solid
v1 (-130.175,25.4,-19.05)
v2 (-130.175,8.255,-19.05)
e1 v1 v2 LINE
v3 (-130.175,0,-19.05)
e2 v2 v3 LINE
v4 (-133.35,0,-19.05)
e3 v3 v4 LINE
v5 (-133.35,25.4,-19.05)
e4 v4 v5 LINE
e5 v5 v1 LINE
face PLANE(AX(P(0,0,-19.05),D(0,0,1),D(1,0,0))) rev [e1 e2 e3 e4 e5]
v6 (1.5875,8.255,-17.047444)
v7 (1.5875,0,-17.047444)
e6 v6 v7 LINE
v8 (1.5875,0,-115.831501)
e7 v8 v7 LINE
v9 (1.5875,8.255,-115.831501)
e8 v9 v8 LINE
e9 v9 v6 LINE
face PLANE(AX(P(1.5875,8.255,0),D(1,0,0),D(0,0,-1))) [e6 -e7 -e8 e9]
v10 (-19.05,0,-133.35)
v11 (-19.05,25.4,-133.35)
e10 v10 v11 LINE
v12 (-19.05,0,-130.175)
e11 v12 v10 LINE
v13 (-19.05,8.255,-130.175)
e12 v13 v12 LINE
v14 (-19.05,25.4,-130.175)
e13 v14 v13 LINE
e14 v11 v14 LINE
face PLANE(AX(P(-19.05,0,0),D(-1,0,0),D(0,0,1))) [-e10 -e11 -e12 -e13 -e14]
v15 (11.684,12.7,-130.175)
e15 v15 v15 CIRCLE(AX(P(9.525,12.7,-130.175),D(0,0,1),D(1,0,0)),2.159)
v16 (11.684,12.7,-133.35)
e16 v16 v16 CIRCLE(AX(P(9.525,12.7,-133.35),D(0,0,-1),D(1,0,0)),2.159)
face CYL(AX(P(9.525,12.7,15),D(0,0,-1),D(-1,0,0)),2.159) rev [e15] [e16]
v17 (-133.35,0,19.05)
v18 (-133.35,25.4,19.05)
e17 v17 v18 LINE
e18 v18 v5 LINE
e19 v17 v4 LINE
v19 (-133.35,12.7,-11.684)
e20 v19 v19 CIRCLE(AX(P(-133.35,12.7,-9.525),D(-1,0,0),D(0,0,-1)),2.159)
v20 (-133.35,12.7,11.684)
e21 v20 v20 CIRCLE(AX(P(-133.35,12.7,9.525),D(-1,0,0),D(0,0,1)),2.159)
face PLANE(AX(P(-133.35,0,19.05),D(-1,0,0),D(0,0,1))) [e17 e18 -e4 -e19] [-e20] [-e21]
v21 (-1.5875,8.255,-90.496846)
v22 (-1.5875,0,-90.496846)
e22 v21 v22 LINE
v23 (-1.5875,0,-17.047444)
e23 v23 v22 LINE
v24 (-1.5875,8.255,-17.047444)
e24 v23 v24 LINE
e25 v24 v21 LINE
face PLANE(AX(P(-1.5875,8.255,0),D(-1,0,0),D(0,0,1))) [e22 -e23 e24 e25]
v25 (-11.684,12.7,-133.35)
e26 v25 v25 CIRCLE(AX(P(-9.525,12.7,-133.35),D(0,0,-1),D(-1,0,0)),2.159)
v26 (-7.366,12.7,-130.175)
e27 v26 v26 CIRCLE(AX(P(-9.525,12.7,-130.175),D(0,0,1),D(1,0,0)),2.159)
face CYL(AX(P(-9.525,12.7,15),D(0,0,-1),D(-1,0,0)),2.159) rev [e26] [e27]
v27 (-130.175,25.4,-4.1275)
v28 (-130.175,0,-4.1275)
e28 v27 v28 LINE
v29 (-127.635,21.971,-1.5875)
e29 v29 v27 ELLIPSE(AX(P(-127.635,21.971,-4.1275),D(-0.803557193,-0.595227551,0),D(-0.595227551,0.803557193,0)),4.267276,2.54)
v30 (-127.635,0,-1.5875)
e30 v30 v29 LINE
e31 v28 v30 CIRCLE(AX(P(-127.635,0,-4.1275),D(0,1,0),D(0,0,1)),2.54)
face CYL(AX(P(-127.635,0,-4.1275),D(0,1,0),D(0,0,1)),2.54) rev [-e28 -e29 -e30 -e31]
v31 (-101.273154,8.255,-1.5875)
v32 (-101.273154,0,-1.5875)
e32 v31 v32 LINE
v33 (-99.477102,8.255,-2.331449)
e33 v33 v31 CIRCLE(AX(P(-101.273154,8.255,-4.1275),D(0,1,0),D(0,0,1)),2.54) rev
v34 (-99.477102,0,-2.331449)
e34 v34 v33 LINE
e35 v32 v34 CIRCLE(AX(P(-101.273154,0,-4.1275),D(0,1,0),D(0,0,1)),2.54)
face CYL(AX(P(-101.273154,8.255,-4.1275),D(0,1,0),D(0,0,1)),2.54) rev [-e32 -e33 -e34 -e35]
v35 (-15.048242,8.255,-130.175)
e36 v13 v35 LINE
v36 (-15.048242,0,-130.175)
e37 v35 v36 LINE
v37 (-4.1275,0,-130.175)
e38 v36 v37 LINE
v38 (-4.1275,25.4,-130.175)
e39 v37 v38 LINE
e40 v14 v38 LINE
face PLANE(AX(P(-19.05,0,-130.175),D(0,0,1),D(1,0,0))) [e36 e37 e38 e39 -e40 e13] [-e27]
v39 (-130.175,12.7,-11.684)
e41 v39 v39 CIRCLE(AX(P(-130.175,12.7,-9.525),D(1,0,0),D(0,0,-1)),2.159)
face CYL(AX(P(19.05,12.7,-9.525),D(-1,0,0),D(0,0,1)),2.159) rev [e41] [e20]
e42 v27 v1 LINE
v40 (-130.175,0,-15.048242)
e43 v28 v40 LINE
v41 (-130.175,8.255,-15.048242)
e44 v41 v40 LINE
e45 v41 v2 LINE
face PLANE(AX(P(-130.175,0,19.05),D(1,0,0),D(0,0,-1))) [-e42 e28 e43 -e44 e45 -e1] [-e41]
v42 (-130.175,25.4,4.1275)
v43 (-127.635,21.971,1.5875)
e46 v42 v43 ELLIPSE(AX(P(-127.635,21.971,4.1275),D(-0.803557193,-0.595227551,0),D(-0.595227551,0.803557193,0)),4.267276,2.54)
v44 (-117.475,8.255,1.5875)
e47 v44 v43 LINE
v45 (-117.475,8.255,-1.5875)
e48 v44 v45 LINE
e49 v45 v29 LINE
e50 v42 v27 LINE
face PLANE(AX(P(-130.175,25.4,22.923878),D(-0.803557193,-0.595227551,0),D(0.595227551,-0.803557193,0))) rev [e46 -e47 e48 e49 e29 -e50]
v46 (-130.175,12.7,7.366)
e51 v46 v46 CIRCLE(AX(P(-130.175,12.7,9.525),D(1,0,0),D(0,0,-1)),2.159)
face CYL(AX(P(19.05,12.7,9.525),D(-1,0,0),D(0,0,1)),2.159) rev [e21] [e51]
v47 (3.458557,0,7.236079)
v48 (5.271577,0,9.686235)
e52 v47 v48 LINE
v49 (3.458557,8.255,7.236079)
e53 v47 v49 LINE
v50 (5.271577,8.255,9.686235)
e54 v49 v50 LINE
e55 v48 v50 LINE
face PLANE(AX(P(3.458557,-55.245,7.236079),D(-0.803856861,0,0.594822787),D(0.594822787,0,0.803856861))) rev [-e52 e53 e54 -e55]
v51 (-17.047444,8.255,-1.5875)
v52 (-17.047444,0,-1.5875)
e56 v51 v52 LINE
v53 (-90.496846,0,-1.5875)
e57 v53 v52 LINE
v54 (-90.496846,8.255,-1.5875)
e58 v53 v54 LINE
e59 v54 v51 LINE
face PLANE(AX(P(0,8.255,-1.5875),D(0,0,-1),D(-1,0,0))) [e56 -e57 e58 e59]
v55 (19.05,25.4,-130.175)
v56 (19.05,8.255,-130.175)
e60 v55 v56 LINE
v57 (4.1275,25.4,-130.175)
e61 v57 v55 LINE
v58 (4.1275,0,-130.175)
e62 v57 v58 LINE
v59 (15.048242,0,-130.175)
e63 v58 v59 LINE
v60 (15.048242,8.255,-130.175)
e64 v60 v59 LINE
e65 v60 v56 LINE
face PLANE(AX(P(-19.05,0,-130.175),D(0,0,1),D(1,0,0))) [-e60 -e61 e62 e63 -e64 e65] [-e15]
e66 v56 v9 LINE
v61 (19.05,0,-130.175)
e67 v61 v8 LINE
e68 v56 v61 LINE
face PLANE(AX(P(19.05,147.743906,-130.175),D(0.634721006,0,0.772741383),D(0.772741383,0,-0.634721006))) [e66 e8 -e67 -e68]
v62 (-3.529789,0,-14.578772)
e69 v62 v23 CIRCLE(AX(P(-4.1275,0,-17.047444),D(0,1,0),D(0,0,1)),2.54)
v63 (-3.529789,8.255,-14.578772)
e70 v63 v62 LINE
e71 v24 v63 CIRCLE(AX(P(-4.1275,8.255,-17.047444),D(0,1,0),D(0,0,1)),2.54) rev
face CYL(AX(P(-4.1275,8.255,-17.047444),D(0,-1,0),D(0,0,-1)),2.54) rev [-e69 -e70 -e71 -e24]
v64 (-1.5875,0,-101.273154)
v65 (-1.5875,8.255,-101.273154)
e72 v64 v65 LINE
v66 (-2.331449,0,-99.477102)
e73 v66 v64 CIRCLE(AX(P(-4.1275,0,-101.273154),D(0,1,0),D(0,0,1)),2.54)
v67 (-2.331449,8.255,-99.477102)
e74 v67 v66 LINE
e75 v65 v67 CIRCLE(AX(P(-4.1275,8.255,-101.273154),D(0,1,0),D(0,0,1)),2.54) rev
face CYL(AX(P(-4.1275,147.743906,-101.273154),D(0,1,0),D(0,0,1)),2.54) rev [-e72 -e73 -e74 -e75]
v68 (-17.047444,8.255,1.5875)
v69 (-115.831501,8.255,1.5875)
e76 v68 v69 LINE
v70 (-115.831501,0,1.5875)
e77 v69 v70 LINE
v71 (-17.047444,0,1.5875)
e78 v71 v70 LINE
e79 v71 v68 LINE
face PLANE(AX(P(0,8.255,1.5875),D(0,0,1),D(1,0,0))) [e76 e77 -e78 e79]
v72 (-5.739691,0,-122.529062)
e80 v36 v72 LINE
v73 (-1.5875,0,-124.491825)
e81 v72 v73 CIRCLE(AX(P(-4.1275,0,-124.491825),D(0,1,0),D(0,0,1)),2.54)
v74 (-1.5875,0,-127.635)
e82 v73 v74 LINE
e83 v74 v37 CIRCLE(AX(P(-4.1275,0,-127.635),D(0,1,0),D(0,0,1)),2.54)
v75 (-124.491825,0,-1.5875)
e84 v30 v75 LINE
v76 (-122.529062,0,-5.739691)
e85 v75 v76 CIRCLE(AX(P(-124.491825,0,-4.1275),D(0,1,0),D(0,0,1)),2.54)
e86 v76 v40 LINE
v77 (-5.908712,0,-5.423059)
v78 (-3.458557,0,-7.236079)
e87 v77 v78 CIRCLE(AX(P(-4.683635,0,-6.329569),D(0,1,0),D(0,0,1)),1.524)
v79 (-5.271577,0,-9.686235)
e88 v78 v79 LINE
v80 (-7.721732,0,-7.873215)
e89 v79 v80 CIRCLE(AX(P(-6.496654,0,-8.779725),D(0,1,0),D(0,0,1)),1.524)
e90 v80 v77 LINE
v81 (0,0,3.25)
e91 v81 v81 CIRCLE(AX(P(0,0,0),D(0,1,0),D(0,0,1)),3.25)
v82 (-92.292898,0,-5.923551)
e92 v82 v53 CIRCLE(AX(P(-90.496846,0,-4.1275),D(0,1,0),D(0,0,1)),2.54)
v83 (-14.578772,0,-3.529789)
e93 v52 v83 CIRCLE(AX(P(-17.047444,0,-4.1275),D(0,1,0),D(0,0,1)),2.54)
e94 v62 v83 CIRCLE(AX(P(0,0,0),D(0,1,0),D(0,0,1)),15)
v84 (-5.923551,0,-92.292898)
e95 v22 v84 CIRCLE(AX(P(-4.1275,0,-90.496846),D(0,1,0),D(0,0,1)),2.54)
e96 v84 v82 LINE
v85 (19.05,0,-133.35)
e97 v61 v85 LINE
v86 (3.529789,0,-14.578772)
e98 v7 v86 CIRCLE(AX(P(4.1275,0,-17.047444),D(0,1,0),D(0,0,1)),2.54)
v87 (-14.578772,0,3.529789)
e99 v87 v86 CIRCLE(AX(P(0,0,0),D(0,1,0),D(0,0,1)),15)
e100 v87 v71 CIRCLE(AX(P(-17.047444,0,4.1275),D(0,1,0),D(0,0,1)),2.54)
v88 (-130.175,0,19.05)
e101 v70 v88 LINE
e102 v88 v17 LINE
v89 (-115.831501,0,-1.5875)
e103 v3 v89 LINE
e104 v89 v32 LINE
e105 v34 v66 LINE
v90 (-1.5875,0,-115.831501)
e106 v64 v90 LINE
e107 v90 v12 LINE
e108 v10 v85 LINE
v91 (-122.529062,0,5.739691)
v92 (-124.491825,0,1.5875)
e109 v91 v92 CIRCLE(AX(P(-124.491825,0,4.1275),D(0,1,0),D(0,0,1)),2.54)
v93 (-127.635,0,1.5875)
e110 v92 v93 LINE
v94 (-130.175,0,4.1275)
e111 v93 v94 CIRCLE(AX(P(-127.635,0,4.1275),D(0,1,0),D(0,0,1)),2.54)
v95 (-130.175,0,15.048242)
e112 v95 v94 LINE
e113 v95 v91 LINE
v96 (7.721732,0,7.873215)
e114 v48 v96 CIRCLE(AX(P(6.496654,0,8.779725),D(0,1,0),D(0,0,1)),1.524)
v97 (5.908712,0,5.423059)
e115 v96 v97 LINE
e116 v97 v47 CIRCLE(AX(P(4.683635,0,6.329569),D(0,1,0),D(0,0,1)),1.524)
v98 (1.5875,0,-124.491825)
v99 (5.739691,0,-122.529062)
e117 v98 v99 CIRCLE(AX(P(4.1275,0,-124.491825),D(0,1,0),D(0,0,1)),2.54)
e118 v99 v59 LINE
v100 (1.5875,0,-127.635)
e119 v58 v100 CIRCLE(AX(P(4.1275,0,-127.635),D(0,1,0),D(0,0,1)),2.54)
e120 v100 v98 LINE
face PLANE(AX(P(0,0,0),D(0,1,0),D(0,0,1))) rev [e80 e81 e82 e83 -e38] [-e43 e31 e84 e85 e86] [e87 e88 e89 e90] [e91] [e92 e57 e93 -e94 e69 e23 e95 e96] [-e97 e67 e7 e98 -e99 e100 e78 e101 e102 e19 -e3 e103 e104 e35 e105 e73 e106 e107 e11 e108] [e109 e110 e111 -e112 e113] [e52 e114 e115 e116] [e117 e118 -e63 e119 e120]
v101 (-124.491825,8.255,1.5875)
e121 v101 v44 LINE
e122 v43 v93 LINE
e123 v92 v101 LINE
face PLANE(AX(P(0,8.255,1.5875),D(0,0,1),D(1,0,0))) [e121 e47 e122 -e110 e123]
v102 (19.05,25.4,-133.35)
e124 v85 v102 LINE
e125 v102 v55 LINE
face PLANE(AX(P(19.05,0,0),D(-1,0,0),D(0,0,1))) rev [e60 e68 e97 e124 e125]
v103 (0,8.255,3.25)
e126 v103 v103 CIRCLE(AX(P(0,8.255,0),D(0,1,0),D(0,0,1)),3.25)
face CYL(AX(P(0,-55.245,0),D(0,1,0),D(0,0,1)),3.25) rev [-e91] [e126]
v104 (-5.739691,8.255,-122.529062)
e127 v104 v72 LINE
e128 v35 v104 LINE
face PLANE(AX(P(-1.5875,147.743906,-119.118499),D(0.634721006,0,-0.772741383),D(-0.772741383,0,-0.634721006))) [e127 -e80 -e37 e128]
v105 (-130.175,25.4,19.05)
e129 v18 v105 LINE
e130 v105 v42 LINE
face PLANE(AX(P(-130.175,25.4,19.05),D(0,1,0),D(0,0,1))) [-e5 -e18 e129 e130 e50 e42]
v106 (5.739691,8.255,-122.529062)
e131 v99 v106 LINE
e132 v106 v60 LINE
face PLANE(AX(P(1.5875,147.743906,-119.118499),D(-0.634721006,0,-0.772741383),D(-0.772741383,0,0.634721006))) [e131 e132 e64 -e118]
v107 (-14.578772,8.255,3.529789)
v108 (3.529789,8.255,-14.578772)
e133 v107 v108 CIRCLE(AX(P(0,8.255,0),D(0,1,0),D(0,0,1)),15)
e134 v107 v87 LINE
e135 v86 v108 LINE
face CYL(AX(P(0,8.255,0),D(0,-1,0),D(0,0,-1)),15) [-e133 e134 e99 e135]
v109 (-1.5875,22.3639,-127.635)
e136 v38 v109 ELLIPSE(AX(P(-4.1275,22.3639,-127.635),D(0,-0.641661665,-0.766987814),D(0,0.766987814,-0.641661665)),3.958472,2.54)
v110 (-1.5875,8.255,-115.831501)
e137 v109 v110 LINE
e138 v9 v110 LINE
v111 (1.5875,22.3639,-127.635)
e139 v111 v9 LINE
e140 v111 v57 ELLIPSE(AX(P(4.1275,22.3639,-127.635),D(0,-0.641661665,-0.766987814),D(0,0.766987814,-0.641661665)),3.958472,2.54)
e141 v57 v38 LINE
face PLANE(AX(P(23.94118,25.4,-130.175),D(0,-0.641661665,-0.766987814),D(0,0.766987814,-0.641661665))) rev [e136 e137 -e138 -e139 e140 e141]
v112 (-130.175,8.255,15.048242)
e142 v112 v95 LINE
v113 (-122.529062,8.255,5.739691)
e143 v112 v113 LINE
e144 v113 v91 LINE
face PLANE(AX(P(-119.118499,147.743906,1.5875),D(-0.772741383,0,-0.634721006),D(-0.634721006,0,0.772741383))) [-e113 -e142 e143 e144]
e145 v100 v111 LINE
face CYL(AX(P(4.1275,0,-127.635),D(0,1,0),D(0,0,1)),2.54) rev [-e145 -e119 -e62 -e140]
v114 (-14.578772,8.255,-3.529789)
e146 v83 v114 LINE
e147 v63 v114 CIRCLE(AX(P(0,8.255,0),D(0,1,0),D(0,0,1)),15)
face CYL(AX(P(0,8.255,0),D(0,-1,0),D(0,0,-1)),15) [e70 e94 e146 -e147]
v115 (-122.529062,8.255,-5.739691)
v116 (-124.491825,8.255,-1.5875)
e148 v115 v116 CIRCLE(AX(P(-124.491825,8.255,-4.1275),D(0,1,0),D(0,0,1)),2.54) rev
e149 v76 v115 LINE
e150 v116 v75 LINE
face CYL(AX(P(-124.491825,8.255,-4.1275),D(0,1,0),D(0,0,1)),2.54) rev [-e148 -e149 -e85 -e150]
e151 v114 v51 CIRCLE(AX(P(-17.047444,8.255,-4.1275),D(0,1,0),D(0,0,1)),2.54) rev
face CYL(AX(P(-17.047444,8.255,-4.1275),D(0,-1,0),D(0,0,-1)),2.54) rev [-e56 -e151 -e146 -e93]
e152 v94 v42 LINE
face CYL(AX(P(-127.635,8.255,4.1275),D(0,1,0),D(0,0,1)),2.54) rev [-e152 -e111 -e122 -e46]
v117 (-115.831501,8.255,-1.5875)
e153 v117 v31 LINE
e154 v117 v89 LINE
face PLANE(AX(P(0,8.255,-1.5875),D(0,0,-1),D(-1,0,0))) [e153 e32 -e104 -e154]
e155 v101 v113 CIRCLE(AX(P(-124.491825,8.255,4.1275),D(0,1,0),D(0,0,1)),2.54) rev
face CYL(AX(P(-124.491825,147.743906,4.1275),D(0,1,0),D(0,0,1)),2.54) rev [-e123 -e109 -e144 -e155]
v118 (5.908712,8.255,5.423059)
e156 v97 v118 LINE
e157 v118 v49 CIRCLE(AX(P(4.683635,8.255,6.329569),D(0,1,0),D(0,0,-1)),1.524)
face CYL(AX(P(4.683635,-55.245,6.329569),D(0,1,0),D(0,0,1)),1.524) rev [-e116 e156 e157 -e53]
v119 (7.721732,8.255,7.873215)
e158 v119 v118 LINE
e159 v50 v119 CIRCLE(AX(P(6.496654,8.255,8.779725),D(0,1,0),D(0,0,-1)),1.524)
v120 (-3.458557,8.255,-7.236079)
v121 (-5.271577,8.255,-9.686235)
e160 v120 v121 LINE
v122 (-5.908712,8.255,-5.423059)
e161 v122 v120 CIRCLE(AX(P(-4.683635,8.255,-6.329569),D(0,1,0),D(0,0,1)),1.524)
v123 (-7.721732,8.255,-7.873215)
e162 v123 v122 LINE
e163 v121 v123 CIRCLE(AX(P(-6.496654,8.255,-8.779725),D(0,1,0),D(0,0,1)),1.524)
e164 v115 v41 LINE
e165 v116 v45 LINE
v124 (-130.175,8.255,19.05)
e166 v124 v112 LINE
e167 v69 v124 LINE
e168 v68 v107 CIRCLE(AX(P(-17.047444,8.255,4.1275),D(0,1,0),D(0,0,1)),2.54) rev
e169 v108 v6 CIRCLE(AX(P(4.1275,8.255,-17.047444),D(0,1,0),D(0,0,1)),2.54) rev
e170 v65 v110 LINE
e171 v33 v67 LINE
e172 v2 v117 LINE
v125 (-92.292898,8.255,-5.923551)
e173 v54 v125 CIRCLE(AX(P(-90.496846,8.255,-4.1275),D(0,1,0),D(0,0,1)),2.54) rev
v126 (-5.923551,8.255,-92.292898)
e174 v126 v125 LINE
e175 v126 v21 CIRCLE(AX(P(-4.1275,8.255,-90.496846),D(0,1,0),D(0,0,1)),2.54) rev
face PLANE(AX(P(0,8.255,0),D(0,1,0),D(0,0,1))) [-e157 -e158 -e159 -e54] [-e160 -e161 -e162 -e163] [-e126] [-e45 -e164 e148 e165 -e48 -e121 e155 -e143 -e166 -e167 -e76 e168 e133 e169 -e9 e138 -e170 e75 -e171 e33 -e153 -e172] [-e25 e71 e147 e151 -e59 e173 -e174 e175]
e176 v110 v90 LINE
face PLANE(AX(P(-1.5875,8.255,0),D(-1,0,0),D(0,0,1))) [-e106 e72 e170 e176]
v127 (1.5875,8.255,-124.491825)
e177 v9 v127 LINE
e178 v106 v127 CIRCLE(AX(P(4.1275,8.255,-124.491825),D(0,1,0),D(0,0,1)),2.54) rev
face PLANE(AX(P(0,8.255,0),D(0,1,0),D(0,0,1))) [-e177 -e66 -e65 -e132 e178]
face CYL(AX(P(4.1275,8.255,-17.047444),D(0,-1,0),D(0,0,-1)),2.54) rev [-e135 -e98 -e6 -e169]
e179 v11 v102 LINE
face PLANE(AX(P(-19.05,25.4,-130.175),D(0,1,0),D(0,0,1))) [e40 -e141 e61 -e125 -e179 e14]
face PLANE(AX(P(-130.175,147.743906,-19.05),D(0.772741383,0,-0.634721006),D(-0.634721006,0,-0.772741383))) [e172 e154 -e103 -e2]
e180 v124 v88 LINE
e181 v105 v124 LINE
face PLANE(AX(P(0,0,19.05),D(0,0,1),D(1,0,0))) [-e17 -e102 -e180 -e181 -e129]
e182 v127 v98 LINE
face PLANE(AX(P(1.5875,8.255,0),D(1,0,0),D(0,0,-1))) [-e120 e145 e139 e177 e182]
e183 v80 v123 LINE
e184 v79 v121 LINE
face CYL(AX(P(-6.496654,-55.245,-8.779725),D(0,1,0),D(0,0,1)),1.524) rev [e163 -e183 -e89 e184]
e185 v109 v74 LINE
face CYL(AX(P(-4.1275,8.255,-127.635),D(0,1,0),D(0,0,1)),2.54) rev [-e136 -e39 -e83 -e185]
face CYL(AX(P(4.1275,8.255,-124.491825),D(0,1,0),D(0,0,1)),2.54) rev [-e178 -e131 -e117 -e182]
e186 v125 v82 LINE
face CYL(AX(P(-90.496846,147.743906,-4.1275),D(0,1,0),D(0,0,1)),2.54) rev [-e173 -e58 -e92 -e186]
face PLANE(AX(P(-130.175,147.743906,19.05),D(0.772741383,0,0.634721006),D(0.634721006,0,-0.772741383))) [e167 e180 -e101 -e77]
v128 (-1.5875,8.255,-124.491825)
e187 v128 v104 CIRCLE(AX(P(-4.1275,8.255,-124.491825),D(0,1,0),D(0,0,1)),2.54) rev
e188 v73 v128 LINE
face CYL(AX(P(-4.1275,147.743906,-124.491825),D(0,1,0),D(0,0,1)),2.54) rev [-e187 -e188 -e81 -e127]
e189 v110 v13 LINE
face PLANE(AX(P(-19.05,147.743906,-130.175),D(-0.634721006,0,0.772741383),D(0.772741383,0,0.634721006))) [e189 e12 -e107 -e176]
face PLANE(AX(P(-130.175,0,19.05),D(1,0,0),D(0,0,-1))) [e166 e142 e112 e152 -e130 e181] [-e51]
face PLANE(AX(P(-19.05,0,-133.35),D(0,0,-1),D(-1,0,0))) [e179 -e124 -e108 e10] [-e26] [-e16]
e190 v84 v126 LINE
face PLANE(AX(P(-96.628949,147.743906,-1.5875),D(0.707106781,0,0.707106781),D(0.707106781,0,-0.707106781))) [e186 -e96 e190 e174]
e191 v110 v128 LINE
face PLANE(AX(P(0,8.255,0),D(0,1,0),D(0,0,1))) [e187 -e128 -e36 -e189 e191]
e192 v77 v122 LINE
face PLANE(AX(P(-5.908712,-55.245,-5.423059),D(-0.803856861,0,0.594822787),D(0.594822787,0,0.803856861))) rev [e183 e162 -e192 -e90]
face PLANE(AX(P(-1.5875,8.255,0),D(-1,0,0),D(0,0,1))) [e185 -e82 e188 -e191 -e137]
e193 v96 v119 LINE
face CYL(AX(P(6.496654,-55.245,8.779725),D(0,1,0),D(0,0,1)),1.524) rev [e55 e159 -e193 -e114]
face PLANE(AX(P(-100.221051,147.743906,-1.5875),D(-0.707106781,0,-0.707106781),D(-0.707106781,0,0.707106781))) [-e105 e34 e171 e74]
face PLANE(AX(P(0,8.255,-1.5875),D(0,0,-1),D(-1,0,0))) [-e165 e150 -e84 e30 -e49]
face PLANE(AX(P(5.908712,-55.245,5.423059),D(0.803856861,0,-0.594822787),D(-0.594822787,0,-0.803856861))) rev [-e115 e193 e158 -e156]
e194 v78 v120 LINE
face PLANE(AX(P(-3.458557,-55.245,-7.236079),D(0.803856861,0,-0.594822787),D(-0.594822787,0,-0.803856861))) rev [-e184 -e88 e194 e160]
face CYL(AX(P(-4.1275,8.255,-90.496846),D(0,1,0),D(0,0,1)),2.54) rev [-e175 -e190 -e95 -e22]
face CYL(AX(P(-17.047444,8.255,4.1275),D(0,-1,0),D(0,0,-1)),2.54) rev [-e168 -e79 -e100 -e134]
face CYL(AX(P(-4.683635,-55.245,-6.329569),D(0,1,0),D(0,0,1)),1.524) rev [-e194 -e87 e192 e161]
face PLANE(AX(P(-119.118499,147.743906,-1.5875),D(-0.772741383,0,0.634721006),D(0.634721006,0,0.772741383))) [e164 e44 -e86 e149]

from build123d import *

# Parameters (mm, degrees)
SKETCH1_R                       = 15
BOSS_EXTRUDE2_DEPTH             = 8.255
BOSS_EXTRUDE3_DEPTH             = 8.255
SKETCH5_R                       = 3.249999977
CUT_EXTRUDE3_DEPTH              = 63.5
SKETCH7_W                       = 3.175
SKETCH7_H                       = 25.4
BOSS_EXTRUDE5_DEPTH             = 19.05
SKETCH12_R                      = 2.159
CUT_EXTRUDE6_DEPTH              = 199.993500208
CIRPATTERN2_COUNT               = 2
CIRPATTERN2_ANGLE               = 90
CIRPATTERN3_COUNT               = 2
CIRPATTERN3_ANGLE               = 90
BOSS_EXTRUDE6_DEPTH             = 8.255
BOSS_EXTRUDE7_REACH             = 192.288
BOSS_EXTRUDE7_DIRECTION_2_REACH = 192.288
BOSS_EXTRUDE8_REACH             = 192.288
BOSS_EXTRUDE8_DIRECTION_2_REACH = 192.288
FILLET1_R                       = 2.54


with BuildPart() as part:
    # Sketch1 → Boss-Extrude2 (new body)
    with BuildSketch(Plane(origin=(0, 0, 0), x_dir=(1, 0, 0), z_dir=(0, 1, 0))):
        with Locations(Location((0, 0, 0), (0, 0, 270))):
            Circle(SKETCH1_R)
    extrude(amount=BOSS_EXTRUDE2_DEPTH)

    # Sketch1<6> → Boss-Extrude3 (add)
    with BuildSketch(Plane(origin=(0, 0, 0), x_dir=(1, 0, 0), z_dir=(0, 1, 0))):
        with BuildLine():
            Line((-1.5875, 130.175), (-1.5875, 14.915758236))
            ThreePointArc((-1.5875, 14.915758236), (0, 15), (1.5875, 14.915758236))
            Line((1.5875, 14.915758236), (1.5875, 130.175))
            Line((1.5875, 130.175), (-1.5875, 130.175))
        make_face()
        with BuildLine():
            ThreePointArc((-14.915758236, -1.5875), (-15, 0), (-14.915758236, 1.5875))
            Line((-14.915758236, 1.5875), (-130.175, 1.5875))
            Line((-130.175, 1.5875), (-130.175, -1.5875))
            Line((-130.175, -1.5875), (-14.915758236, -1.5875))
        make_face()
    extrude(amount=BOSS_EXTRUDE3_DEPTH)

    # Sketch5 → Cut-Extrude3 (cut)
    with BuildSketch(Plane(origin=(0, 8.255, 0), x_dir=(1, 0, 0), z_dir=(0, 1, 0))):
        with Locations(Location((0, 0, 0), (0, 0, 270))):
            Circle(SKETCH5_R)
        with BuildLine():
            Line((-5.908712478, 5.423058993), (-7.721732332, 7.873214705))
            ThreePointArc((-7.721732332, 7.873214705), (-7.403164404, 10.004802487), (-5.271576621, 9.686234559))
            Line((-5.271576621, 9.686234559), (-3.458556767, 7.236078848))
            ThreePointArc((-3.458556767, 7.236078848), (-3.777124696, 5.104491065), (-5.908712478, 5.423058993))
        make_face()
        with BuildLine():
            Line((3.458556767, -7.236078848), (5.271576621, -9.686234559))
            ThreePointArc((5.271576621, -9.686234559), (7.403164404, -10.004802487), (7.721732332, -7.873214705))
            Line((7.721732332, -7.873214705), (5.908712478, -5.423058993))
            ThreePointArc((5.908712478, -5.423058993), (3.777124696, -5.104491065), (3.458556767, -7.236078848))
        make_face()
    extrude(amount=-CUT_EXTRUDE3_DEPTH, mode=Mode.SUBTRACT)

    # Sketch7 → Boss-Extrude5 (add, symmetric)
    with BuildSketch(Plane(origin=(0, 0, 0), x_dir=(0, 0, -1), z_dir=(1, 0, 0))):
        with Locations((131.7625, 12.7)):
            Rectangle(SKETCH7_W, SKETCH7_H)
    boss_extrude5 = extrude(amount=BOSS_EXTRUDE5_DEPTH, both=True)

    # Sketch12 → Cut-Extrude6 (cut, through all)
    with BuildSketch(Plane(origin=(0, 0, -133.35), x_dir=(-1, 0, 0), z_dir=(0, 0, -1))):
        with Locations((9.525, 12.7)):
            Circle(SKETCH12_R)
        with Locations(Location((-9.525, 12.7, 0), (0, 0, 180))):
            Circle(SKETCH12_R)
    cut_extrude6 = extrude(amount=-CUT_EXTRUDE6_DEPTH, mode=Mode.SUBTRACT)

    # CirPattern2: Boss-Extrude5 ×2 about axis
    cirpattern2_axis = Axis((0, 0, 0), (0, 1, 0))
    for i in range(1, CIRPATTERN2_COUNT):
        add(boss_extrude5.rotate(cirpattern2_axis, i * CIRPATTERN2_ANGLE / (CIRPATTERN2_COUNT - 1)))

    # CirPattern3: Cut-Extrude6 ×2 about axis
    cirpattern3_axis = Axis((0, 0, 0), (0, 1, 0))
    for i in range(1, CIRPATTERN3_COUNT):
        add(cut_extrude6.rotate(cirpattern3_axis, i * CIRPATTERN3_ANGLE / (CIRPATTERN3_COUNT - 1)), mode=Mode.SUBTRACT)

    # Sketch13 → Boss-Extrude6 (add)
    with BuildSketch(Plane.XZ):
        Polygon((-96.628948776, -1.5875), (-1.5875, -96.628948776), (-1.5875, -100.221051224), (-100.221051224, -1.5875), align=None)
        Polygon((-19.05, -130.175), (-1.5875, -115.831500599), (-1.5875, -119.118499401), (-15.048241783, -130.175), align=None)
        Polygon((19.05, -130.175), (1.5875, -115.831500599), (1.5875, -119.118499401), (15.048241783, -130.175), align=None)
        Polygon((-119.118499401, 1.5875), (-130.175, 15.048241783), (-130.175, 19.05), (-115.831500599, 1.5875), align=None)
        Polygon((-119.118499401, -1.5875), (-130.175, -15.048241783), (-130.175, -19.05), (-115.831500599, -1.5875), align=None)
    extrude(amount=-BOSS_EXTRUDE6_DEPTH)

    # Boss-Extrude7: up to this face of the body (flat: up to its plane)
    boss_extrude7_end = Plane(part.part.faces().sort_by_distance((-124.646749701, 4.1275, 1.5875))[0])
    # Sketch14 → Boss-Extrude7 (add, up to the picked face)
    with BuildSketch(Plane.XY, mode=Mode.PRIVATE) as boss_extrude7_sk1:
        Polygon((-130.175, 25.4), (-117.475, 8.255), (-130.175, 8.255), align=None)
    boss_extrude7_tool1 = split(extrude(boss_extrude7_sk1.sketch, amount=BOSS_EXTRUDE7_REACH, mode=Mode.PRIVATE), bisect_by=boss_extrude7_end, keep=Keep.BOTH, mode=Mode.PRIVATE)
    add(boss_extrude7_tool1.solids().sort_by(Axis((-125.941667, 13.97, 0), (0, 0, 1)))[0])

    # Boss-Extrude7 direction 2: up to this face of the body (flat: up to its plane)
    boss_extrude7_direction_2_end = Plane(part.part.faces().sort_by_distance((-124.646749701, 4.1275, -1.5875))[0])
    # Sketch14 → Boss-Extrude7 direction 2 (add, up to the picked face)
    with BuildSketch(Plane.XY, mode=Mode.PRIVATE) as boss_extrude7_direction_2_sk1:
        Polygon((-130.175, 25.4), (-117.475, 8.255), (-130.175, 8.255), align=None)
    boss_extrude7_direction_2_tool1 = split(extrude(boss_extrude7_direction_2_sk1.sketch, amount=-BOSS_EXTRUDE7_DIRECTION_2_REACH, mode=Mode.PRIVATE), bisect_by=boss_extrude7_direction_2_end, keep=Keep.BOTH, mode=Mode.PRIVATE)
    add(boss_extrude7_direction_2_tool1.solids().sort_by(Axis((-125.941667, 13.97, 0), (0, 0, -1)))[0])

    # Boss-Extrude8: up to this face of the body (flat: up to its plane)
    boss_extrude8_end = Plane(part.part.faces().sort_by_distance((1.5875, 4.1275, -65.373629417))[0])
    # Sketch15 → Boss-Extrude8 (add, up to the picked face)
    with BuildSketch(Plane(origin=(0, 0, 0), x_dir=(0, 0, -1), z_dir=(1, 0, 0)), mode=Mode.PRIVATE) as boss_extrude8_sk1:
        Polygon((130.175, 25.4), (115.831500599, 8.255), (130.175, 8.255), align=None)
    boss_extrude8_tool1 = split(extrude(boss_extrude8_sk1.sketch, amount=BOSS_EXTRUDE8_REACH, mode=Mode.PRIVATE), bisect_by=boss_extrude8_end, keep=Keep.BOTH, mode=Mode.PRIVATE)
    add(boss_extrude8_tool1.solids().sort_by(Axis((0, 13.97, -125.393834), (1, 0, 0)))[0])

    # Boss-Extrude8 direction 2: up to this face of the body (flat: up to its plane)
    boss_extrude8_direction_2_end = Plane(part.part.faces().sort_by_distance((-1.5875, 4.1275, -108.026275912))[0])
    # Sketch15 → Boss-Extrude8 direction 2 (add, up to the picked face)
    with BuildSketch(Plane(origin=(0, 0, 0), x_dir=(0, 0, -1), z_dir=(1, 0, 0)), mode=Mode.PRIVATE) as boss_extrude8_direction_2_sk1:
        Polygon((130.175, 25.4), (115.831500599, 8.255), (130.175, 8.255), align=None)
    boss_extrude8_direction_2_tool1 = split(extrude(boss_extrude8_direction_2_sk1.sketch, amount=-BOSS_EXTRUDE8_DIRECTION_2_REACH, mode=Mode.PRIVATE), bisect_by=boss_extrude8_direction_2_end, keep=Keep.BOTH, mode=Mode.PRIVATE)
    add(boss_extrude8_direction_2_tool1.solids().sort_by(Axis((0, 13.97, -125.393834), (-1, 0, 0)))[0])

    # Fillet1
    # the kernel refuses this fillet: 2.54 mm, written as the material it adds along each edge
    with BuildSketch(Plane(origin=(-1.5875, 0, -100.221051224), x_dir=(0, 0, -1), z_dir=(0, 1, 0)), Plane(origin=(-100.221051224, 0, -1.5875), x_dir=(0.7071067811865548, 0, -0.70710678118654), z_dir=(0, 1, 0))) as fillet1_piece_1:
        with BuildLine():
            CenterArc((FILLET1_R * 0.414213562373, FILLET1_R), FILLET1_R, 225, 45)
            Line((-FILLET1_R * 0.292893218813, FILLET1_R * 0.292893218813), (0, 0))
            Line((0, 0), (FILLET1_R * 0.414213562373, 0))
        make_face()
    extrude(amount=8.255)
    with BuildSketch(Plane(origin=(-1.5875, 0, -96.628948776), x_dir=(-0.7071067811865486, 0, 0.7071067811865464), z_dir=(0, 1, 0))) as fillet1_piece_2:
        with BuildLine():
            CenterArc((FILLET1_R * 2.41421356237, FILLET1_R), FILLET1_R, 135, 135)
            Line((FILLET1_R * 1.70710678119, FILLET1_R * 1.70710678119), (0, 0))
            Line((0, 0), (FILLET1_R * 2.41421356237, 0))
        make_face()
    extrude(amount=8.255)
    with BuildSketch(Plane(origin=(-96.628948776, 0, -1.5875), x_dir=(0.7071067811865482, 0, -0.7071067811865468), z_dir=(0, 1, 0))) as fillet1_piece_3:
        with BuildLine():
            CenterArc((FILLET1_R * 2.41421356237, -FILLET1_R), FILLET1_R, 90, 135)
            Line((FILLET1_R * 1.70710678119, -FILLET1_R * 1.70710678119), (0, 0))
            Line((0, 0), (FILLET1_R * 2.41421356237, 0))
        make_face()
    extrude(amount=8.255)
    with BuildSketch(Plane(origin=(-1.5875, 0, -119.118499401), x_dir=(-0.7727413829078122, 0, -0.6347210057511268), z_dir=(0, 1, 0)), Plane(origin=(-119.118499401, 0, 1.5875), x_dir=(-0.6347210057511247, 0, 0.772741382907814), z_dir=(0, 1, 0))) as fillet1_piece_4:
        with BuildLine():
            CenterArc((FILLET1_R * 2.11548267235, -FILLET1_R), FILLET1_R, 90, 129.399295056)
            Line((FILLET1_R * 1.34274128944, -FILLET1_R * 1.63472100575), (0, 0))
            Line((0, 0), (FILLET1_R * 2.11548267235, 0))
        make_face()
    extrude(amount=8.255)
    with BuildSketch(Plane(origin=(1.5875, 0, -119.118499401), x_dir=(0.7727413829078027, 0, -0.6347210057511384), z_dir=(0, 1, 0)), Plane(origin=(-119.118499401, 0, -1.5875), x_dir=(-0.6347210057511417, 0, -0.7727413829077999), z_dir=(0, 1, 0))) as fillet1_piece_5:
        with BuildLine():
            CenterArc((FILLET1_R * 2.11548267235, FILLET1_R), FILLET1_R, 140.600704944, 129.399295056)
            Line((FILLET1_R * 1.34274128944, FILLET1_R * 1.63472100575), (0, 0))
            Line((0, 0), (FILLET1_R * 2.11548267235, 0))
        make_face()
    extrude(amount=8.255)
    with BuildSketch(Plane(origin=(-1.5875, 0, -14.915758236), x_dir=(0, 0, -1), z_dir=(0, 1, 0)), Plane(origin=(-14.915758236, 0, 1.5875), x_dir=(-1, 0, 0), z_dir=(0, 1, 0))) as fillet1_piece_6:
        with BuildLine():
            CenterArc((2.131685671, 2.54), FILLET1_R, 193.610443403, 76.389556597)
            ThreePointArc((-0.336986366, 1.942289054), (-0.136551619, 0.976686375), (0, 0))
            Line((0, 0), (2.131685671, 0))
        make_face()
    extrude(amount=8.255)
    with BuildSketch(Plane(origin=(1.5875, 0, -14.915758236), x_dir=(0.9852804411442203, 0, 0.1709457583523227), z_dir=(0, 1, 0)), Plane(origin=(-14.915758236, 0, -1.5875), x_dir=(0.1709457583523069, 0, -0.985280441144223), z_dir=(0, 1, 0))) as fillet1_piece_7:
        with BuildLine():
            CenterArc((2.138209697, 2.534510424), FILLET1_R, 189.842811987, 76.389556597)
            Line((-0.364402624, 2.100308198), (0, 0))
            ThreePointArc((0, 0), (0.985652903, 0.032418754), (1.971305805, 0))
        make_face()
    extrude(amount=8.255)
    with BuildSketch(Plane(origin=(1.5875, 25.4, -130.175), x_dir=(0, 0, 1), z_dir=(0, -1, 0))) as fillet1_piece_8_section:
        with BuildLine():
            CenterArc((FILLET1_R, -FILLET1_R), FILLET1_R, 90, 90)
            Line((0, -FILLET1_R), (0, 0))
            Line((0, 0), (FILLET1_R, 0))
        make_face()
    fillet1_piece_8 = extrude(amount=25.4, mode=Mode.PRIVATE)
    fillet1_piece_8 = split(fillet1_piece_8, bisect_by=Plane(origin=(2.171046613, 17.455238274, -123.528415861), z_dir=(0, -0.6416616654193366, -0.7669878141999933)), keep=Keep.TOP, mode=Mode.PRIVATE)
    add(fillet1_piece_8)
    with BuildSketch(Plane(origin=(-1.5875, 25.4, -130.175), x_dir=(-1, 0, 0), z_dir=(0, -1, 0))) as fillet1_piece_9_section:
        with BuildLine():
            CenterArc((FILLET1_R, -FILLET1_R), FILLET1_R, 90, 90)
            Line((0, -FILLET1_R), (0, 0))
            Line((0, 0), (FILLET1_R, 0))
        make_face()
    fillet1_piece_9 = extrude(amount=25.4, mode=Mode.PRIVATE)
    fillet1_piece_9 = split(fillet1_piece_9, bisect_by=Plane(origin=(-2.171046613, 17.455238274, -123.528415861), z_dir=(0, -0.6416616654193366, -0.7669878141999933)), keep=Keep.TOP, mode=Mode.PRIVATE)
    add(fillet1_piece_9)
    with BuildSketch(Plane(origin=(-130.175, 25.4, -1.5875), x_dir=(1, 0, 0), z_dir=(0, -1, 0))) as fillet1_piece_10_section:
        with BuildLine():
            CenterArc((FILLET1_R, -FILLET1_R), FILLET1_R, 90, 90)
            Line((0, -FILLET1_R), (0, 0))
            Line((0, 0), (FILLET1_R, 0))
        make_face()
    fillet1_piece_10 = extrude(amount=25.4, mode=Mode.PRIVATE)
    fillet1_piece_10 = split(fillet1_piece_10, bisect_by=Plane(origin=(-123.721618639, 16.687935162, -2.172181801), z_dir=(-0.8035571933447456, -0.5952275506257377, 0)), keep=Keep.TOP, mode=Mode.PRIVATE)
    add(fillet1_piece_10)
    with BuildSketch(Plane(origin=(-130.175, 25.4, 1.5875), x_dir=(0, 0, 1), z_dir=(0, -1, 0))) as fillet1_piece_11_section:
        with BuildLine():
            CenterArc((FILLET1_R, -FILLET1_R), FILLET1_R, 90, 90)
            Line((0, -FILLET1_R), (0, 0))
            Line((0, 0), (FILLET1_R, 0))
        make_face()
    fillet1_piece_11 = extrude(amount=25.4, mode=Mode.PRIVATE)
    fillet1_piece_11 = split(fillet1_piece_11, bisect_by=Plane(origin=(-123.721618639, 16.687935162, 2.172181801), z_dir=(-0.8035571933447456, -0.5952275506257377, 0)), keep=Keep.TOP, mode=Mode.PRIVATE)
    add(fillet1_piece_11)


solid = part.part
